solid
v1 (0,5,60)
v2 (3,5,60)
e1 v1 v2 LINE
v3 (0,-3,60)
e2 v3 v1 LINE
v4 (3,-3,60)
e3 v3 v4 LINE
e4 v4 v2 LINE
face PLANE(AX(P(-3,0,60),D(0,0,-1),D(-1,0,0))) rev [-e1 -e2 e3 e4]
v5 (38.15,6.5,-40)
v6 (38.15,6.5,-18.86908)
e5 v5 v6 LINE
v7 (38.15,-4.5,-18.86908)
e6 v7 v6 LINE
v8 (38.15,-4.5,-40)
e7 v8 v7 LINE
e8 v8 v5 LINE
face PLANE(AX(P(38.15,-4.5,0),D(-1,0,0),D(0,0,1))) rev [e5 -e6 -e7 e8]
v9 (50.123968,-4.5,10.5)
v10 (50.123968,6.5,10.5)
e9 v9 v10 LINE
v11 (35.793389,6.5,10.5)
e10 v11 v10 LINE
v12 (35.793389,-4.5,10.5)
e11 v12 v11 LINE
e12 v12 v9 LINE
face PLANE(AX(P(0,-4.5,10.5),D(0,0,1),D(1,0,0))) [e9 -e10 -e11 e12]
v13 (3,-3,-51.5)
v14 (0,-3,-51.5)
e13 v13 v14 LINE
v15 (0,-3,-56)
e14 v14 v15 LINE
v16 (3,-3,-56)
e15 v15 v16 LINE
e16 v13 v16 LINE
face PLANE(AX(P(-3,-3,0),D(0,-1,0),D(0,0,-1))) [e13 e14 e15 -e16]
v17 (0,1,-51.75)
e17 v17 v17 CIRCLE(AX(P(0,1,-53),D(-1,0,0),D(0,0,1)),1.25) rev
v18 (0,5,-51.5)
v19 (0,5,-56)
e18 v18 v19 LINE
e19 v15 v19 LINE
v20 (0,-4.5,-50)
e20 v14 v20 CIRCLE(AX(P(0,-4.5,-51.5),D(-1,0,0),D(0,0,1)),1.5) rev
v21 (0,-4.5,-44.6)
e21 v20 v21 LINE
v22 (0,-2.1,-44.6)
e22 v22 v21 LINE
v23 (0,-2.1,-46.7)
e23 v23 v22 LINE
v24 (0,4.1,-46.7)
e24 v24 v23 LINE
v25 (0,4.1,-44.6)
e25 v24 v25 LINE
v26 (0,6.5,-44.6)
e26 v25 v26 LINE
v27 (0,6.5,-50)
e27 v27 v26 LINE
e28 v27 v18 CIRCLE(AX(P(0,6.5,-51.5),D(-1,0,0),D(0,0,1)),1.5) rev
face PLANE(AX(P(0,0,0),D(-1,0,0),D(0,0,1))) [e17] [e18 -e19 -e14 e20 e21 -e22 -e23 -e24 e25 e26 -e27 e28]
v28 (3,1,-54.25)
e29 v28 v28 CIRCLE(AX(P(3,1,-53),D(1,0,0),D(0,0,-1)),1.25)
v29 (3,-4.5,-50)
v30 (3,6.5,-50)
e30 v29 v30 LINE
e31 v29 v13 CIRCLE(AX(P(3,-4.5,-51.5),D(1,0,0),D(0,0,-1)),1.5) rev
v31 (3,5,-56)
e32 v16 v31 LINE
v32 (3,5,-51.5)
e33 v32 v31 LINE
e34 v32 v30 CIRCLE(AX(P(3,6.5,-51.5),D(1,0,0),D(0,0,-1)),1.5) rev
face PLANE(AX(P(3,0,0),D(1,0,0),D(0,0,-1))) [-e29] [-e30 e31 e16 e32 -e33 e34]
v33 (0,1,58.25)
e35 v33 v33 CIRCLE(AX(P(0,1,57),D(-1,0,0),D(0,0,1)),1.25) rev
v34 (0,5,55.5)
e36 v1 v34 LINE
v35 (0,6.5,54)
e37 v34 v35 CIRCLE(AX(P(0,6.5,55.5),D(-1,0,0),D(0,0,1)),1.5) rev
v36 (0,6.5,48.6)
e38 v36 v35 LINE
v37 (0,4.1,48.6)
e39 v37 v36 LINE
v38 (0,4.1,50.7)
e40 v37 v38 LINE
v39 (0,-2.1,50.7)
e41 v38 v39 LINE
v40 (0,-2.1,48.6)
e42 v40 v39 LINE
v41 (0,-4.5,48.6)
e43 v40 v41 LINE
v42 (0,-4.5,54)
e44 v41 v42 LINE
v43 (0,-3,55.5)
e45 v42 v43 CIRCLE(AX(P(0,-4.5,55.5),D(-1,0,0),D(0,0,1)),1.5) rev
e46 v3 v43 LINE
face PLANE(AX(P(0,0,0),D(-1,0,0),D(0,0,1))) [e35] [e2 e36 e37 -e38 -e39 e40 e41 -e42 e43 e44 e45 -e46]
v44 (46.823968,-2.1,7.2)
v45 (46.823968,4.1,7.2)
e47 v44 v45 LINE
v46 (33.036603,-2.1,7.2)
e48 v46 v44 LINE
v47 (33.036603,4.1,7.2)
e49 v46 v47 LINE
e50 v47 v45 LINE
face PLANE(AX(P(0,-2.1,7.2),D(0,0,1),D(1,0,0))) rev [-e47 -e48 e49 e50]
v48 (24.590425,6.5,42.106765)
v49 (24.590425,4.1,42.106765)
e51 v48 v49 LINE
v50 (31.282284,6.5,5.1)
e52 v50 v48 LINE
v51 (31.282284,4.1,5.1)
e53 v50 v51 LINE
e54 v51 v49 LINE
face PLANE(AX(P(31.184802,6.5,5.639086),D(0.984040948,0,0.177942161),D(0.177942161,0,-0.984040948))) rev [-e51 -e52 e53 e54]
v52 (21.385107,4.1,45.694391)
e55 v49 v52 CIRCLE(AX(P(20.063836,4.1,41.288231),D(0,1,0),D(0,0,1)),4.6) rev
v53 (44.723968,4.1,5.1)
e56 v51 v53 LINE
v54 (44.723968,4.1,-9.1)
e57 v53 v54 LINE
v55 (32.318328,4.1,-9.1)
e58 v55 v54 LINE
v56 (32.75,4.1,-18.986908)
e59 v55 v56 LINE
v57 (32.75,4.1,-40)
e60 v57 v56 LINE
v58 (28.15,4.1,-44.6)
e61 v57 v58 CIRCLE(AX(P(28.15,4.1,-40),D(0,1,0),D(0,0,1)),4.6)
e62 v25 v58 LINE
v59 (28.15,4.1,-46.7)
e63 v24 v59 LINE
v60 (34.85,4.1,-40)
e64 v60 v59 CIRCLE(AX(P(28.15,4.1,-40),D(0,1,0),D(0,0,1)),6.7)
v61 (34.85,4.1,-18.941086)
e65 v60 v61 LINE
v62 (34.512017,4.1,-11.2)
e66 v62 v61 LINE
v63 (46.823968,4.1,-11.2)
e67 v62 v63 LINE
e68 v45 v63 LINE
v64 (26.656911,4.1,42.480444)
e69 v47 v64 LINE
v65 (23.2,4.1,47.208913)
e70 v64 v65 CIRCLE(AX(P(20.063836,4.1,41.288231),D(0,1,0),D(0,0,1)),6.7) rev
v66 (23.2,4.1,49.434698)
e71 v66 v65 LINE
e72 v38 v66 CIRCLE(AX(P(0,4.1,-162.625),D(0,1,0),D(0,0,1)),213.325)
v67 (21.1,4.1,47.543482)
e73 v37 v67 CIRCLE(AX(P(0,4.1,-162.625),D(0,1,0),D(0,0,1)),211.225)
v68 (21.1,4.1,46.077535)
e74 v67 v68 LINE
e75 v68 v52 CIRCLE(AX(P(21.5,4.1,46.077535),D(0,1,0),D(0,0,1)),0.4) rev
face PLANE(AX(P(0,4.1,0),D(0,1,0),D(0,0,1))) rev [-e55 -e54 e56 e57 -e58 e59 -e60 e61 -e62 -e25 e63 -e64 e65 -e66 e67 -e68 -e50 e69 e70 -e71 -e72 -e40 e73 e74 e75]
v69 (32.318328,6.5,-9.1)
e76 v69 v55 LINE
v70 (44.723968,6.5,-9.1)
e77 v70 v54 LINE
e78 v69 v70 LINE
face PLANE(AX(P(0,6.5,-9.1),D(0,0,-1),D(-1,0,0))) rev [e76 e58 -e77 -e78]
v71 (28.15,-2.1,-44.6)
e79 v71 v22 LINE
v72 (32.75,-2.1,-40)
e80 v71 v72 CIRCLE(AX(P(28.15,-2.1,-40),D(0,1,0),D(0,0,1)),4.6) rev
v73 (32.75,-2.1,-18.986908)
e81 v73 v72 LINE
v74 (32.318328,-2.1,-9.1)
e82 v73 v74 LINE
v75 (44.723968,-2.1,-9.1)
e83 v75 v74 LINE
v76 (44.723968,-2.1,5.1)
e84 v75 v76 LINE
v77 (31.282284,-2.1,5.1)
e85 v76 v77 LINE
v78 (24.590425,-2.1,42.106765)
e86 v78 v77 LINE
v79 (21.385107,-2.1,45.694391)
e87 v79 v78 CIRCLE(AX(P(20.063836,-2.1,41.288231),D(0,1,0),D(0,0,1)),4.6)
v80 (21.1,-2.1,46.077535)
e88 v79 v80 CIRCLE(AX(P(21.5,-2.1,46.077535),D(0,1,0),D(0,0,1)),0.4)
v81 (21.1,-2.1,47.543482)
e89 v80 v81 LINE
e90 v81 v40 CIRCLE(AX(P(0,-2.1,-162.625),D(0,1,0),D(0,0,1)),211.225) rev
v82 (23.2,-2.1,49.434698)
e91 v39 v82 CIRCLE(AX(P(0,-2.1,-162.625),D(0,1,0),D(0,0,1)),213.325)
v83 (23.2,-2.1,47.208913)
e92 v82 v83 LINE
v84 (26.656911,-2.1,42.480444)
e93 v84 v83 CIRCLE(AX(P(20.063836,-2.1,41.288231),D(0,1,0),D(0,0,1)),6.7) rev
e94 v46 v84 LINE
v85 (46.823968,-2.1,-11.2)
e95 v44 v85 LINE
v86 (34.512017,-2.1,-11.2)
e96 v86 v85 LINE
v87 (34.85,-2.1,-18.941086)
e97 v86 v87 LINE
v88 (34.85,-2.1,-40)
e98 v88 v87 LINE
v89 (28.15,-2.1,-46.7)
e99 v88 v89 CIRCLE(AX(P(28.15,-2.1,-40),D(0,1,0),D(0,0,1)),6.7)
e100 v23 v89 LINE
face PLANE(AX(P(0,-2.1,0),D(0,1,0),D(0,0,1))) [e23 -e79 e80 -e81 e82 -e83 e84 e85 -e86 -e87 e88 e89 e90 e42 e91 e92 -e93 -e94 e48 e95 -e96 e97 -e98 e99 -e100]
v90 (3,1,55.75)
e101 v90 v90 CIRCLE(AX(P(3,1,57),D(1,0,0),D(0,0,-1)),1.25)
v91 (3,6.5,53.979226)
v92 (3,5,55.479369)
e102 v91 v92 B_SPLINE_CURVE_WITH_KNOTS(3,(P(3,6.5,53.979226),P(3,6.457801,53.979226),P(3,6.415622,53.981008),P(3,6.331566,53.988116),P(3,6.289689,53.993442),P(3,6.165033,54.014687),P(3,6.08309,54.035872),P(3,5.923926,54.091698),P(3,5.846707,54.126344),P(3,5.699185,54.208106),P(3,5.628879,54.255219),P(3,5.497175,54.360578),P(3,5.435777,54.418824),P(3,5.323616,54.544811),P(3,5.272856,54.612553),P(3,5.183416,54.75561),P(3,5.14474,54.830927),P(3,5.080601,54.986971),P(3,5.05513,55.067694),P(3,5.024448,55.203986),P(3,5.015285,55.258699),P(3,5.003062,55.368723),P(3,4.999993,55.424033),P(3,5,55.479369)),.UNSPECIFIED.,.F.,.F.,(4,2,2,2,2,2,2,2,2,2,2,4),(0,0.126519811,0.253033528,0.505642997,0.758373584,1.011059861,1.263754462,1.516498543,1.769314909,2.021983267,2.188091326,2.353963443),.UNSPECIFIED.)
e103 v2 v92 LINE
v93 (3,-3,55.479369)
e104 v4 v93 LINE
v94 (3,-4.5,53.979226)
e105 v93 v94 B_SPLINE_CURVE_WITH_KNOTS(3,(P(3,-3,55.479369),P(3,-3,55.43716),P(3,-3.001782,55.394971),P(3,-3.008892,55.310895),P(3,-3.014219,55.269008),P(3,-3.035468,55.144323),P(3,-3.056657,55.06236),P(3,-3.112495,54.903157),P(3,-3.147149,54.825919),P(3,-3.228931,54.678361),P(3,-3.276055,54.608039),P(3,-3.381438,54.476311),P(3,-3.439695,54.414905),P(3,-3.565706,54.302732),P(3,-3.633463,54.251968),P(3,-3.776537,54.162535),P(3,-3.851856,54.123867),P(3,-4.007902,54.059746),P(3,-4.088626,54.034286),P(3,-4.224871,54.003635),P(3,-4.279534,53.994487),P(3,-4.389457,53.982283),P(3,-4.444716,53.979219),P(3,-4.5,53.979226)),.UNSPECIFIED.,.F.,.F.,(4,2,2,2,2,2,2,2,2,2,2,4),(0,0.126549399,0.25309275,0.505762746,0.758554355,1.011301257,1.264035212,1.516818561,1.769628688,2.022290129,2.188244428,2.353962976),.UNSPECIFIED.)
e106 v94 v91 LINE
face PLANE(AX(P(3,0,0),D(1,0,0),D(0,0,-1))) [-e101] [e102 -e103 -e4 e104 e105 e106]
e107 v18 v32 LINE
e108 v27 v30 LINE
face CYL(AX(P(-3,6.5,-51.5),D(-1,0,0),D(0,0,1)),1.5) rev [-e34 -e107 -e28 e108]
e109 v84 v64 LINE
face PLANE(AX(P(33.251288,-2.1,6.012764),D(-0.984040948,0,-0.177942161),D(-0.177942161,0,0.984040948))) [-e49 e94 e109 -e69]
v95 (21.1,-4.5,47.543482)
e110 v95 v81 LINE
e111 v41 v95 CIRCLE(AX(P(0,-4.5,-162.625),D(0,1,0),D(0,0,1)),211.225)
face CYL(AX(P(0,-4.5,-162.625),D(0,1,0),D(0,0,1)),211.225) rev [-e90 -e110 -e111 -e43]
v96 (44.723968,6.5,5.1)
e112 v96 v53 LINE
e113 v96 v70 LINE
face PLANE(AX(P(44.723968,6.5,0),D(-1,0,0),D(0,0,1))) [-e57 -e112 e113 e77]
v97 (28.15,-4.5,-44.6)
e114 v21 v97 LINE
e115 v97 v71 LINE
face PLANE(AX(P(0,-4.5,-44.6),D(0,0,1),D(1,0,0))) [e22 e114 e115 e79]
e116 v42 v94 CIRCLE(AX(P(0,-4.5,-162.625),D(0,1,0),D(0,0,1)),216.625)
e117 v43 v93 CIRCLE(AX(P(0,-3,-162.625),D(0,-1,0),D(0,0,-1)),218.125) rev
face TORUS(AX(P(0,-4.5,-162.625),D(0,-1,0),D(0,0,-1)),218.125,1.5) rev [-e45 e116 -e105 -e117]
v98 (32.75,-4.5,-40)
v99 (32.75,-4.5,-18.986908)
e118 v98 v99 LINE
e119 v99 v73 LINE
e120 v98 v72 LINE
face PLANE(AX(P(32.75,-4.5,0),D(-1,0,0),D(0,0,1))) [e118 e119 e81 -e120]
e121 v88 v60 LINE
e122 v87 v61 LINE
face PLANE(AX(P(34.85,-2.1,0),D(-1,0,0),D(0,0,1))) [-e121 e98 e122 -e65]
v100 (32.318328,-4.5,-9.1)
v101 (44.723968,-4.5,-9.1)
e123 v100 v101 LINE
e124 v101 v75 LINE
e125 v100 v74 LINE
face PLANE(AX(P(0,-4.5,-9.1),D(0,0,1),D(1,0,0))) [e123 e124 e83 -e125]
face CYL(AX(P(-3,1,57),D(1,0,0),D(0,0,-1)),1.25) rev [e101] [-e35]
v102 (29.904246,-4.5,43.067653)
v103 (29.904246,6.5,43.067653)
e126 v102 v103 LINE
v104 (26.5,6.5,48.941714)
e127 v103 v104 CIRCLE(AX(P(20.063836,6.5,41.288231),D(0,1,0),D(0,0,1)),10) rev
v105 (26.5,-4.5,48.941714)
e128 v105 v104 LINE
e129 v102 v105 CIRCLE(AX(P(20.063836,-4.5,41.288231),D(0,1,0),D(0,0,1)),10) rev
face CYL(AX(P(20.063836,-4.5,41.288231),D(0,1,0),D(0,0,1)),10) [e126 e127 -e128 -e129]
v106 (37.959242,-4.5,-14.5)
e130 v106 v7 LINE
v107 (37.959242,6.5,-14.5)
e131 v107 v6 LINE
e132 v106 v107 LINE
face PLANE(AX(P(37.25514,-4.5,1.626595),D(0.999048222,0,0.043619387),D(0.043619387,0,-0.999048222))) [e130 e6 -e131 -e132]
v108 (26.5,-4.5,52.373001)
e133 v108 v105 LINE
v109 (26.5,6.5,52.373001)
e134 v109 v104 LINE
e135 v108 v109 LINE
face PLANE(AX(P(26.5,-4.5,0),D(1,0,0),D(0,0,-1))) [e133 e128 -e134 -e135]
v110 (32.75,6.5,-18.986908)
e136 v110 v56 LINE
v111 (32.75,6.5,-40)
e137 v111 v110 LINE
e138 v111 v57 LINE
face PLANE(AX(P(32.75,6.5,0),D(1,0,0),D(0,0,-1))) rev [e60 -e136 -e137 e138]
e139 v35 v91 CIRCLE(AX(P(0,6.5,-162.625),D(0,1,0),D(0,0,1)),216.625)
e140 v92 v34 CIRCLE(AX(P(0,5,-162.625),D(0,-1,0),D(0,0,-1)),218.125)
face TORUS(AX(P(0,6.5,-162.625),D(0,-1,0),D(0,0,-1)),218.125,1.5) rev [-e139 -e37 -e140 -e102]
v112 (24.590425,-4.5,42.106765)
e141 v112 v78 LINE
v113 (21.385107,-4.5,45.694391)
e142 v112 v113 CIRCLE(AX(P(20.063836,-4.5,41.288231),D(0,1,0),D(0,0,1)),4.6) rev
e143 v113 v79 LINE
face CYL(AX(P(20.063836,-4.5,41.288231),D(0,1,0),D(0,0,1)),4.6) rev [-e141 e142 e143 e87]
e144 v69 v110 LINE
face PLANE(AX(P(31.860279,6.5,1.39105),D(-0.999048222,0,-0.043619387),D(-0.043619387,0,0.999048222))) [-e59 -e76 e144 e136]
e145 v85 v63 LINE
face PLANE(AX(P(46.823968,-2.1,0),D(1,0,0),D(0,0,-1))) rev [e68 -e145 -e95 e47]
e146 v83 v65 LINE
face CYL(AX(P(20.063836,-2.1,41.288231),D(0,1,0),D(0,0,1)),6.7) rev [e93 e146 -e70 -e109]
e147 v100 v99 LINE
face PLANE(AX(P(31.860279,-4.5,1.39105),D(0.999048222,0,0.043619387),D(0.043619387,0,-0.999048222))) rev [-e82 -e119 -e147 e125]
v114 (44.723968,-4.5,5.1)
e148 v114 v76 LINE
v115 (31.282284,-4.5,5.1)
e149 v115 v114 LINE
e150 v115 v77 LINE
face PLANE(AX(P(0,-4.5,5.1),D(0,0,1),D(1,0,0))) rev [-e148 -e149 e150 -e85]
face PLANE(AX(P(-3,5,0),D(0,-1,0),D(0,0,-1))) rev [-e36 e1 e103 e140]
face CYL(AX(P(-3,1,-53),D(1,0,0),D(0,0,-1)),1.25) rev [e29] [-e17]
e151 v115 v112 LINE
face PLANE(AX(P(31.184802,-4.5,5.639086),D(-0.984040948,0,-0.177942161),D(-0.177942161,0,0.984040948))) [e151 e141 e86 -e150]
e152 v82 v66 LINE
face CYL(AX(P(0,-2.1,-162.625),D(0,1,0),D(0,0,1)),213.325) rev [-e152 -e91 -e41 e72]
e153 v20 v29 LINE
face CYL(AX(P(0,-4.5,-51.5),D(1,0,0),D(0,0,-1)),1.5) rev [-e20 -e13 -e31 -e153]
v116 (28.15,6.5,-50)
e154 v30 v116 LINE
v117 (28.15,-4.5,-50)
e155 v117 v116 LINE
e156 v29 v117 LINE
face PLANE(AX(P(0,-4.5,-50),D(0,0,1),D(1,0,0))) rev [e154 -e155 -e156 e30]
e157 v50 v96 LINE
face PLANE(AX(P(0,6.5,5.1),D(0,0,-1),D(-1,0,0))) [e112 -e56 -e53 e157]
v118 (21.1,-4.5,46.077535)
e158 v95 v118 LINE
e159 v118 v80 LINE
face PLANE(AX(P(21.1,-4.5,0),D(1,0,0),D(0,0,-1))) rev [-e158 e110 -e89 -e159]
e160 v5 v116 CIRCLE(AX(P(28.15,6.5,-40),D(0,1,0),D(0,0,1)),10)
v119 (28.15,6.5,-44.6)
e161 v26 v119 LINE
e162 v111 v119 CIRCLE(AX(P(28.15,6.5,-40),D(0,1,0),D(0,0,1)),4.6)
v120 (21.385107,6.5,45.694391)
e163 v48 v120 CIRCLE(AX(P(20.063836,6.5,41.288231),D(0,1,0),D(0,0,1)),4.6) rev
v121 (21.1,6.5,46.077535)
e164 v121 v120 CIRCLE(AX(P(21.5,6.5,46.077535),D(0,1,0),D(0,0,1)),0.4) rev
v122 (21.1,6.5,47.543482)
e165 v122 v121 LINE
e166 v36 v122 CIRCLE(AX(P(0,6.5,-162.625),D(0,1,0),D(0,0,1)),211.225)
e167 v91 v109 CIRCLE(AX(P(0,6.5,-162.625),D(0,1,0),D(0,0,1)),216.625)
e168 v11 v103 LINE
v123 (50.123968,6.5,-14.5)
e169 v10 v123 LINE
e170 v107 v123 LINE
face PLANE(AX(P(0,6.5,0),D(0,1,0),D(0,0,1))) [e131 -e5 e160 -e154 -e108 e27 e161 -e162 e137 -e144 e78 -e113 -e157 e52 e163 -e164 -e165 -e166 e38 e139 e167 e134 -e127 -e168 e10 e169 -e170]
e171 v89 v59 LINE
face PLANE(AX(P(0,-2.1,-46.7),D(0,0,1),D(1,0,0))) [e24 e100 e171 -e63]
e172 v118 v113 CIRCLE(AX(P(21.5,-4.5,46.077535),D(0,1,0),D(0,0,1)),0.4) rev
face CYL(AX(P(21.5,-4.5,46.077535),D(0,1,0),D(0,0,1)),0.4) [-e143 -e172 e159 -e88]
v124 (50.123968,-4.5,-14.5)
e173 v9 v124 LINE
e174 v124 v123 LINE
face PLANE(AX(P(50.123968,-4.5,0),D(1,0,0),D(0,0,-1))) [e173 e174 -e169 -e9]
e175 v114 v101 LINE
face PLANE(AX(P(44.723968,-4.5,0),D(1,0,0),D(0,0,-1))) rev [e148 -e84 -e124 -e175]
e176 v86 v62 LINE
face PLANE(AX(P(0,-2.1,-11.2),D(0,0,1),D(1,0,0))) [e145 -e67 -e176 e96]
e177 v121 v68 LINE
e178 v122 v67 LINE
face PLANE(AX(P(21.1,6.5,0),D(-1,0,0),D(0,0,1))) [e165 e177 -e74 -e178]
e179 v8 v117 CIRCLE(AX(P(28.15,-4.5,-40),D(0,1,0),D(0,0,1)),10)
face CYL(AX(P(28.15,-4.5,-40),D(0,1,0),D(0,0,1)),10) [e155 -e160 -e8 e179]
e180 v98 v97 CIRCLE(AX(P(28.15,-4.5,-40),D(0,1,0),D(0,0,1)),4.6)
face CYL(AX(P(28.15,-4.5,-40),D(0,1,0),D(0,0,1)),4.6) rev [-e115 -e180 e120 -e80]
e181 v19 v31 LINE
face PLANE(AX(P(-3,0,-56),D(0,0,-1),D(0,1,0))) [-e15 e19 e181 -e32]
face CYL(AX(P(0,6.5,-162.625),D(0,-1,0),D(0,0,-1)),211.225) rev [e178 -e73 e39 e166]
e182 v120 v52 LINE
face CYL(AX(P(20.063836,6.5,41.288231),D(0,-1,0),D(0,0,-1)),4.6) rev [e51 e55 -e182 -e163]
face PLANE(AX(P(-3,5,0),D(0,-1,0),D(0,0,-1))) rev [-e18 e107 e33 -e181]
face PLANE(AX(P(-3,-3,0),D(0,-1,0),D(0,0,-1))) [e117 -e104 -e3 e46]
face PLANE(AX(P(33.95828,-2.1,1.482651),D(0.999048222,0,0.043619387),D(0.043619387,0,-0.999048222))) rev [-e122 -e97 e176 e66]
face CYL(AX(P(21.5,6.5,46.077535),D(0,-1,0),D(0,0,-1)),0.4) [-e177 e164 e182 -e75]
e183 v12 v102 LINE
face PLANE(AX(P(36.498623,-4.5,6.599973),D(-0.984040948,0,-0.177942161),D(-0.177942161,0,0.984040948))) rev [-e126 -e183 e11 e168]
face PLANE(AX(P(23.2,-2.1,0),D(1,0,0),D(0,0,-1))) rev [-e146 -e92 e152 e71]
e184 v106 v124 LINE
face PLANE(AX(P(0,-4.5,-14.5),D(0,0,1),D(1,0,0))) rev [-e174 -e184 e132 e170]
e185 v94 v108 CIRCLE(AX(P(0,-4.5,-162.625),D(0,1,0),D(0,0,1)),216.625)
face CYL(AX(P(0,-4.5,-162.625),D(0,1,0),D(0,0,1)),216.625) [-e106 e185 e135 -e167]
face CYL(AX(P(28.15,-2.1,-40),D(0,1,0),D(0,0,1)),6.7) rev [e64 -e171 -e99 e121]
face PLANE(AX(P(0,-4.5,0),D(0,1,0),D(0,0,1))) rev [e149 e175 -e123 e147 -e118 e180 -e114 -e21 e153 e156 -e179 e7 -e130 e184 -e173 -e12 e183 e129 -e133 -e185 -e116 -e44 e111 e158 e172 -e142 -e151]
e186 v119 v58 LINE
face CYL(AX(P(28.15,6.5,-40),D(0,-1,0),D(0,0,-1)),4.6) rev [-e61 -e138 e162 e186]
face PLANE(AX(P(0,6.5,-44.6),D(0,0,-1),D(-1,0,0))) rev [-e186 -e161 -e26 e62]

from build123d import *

# Parameters (mm, degrees)
BOSS_EXTRUDE1_DEPTH      = 4.5
CUT_EXTRUDE3_DEPTH       = 2.1
BOSS_EXTRUDE3_START      = 6.5
BOSS_EXTRUDE3_DEPTH      = 6.5
CUT_EXTRUDE4_START       = 4.1
CUT_EXTRUDE4_DEPTH       = 4.1
BOSS_EXTRUDE4_DEPTH      = 3
BOSS_EXTRUDE4_DEPTH_BACK = 3
SKETCH4_R                = 1.25
SKETCH4_W                = 6
SKETCH4_H                = 8
FILLET1_R                = 1.5
SKETCH5_W                = 150
SKETCH5_H                = 40
CUT_EXTRUDE5_DEPTH       = 79.451654949


with BuildPart() as part:
    # Sketch2 → Boss-Extrude1 (new body)
    with BuildSketch(Plane(origin=(0, 0, 0), x_dir=(1, 0, 0), z_dir=(0, 1, 0))):
        with BuildLine():
            Line((-28.15, 50), (28.15, 50))
            ThreePointArc((28.15, 50), (35.221067812, 47.071067812), (38.15, 40))
            Line((38.15, 40), (38.15, 18.869079534))
            Line((38.15, 18.869079534), (37.959241868, 14.5))
            Line((37.959241868, 14.5), (50.123967842, 14.5))
            Line((50.123967842, 14.5), (50.123967842, -10.5))
            Line((50.123967842, -10.5), (35.7933894, -10.5))
            Line((35.7933894, -10.5), (29.904245688, -43.067652969))
            ThreePointArc((29.904245688, -43.067652969), (28.715879749, -46.302425464), (26.5, -48.941713937))
            Line((26.5, -48.941713937), (26.5, -52.373001444))
            ThreePointArc((26.5, -52.373001444), (0, -54), (-26.5, -52.373001444))
            Line((-26.5, -52.373001444), (-26.5, -48.941713937))
            ThreePointArc((-26.5, -48.941713937), (-28.715879749, -46.302425464), (-29.904245688, -43.067652969))
            Line((-29.904245688, -43.067652969), (-35.7933894, -10.5))
            Line((-35.7933894, -10.5), (-50.123967842, -10.5))
            Line((-50.123967842, -10.5), (-50.123967842, 14.5))
            Line((-50.123967842, 14.5), (-37.959241868, 14.5))
            Line((-37.959241868, 14.5), (-38.15, 18.869079534))
            Line((-38.15, 18.869079534), (-38.15, 40))
            ThreePointArc((-38.15, 40), (-35.221067812, 47.071067812), (-28.15, 50))
        make_face()
        with BuildLine():
            Line((-32.75, 40), (-32.75, 18.986907953))
            Line((-32.75, 18.986907953), (-32.318328276, 9.1))
            Line((-32.318328276, 9.1), (-44.723967842, 9.1))
            Line((-44.723967842, 9.1), (-44.723967842, -5.1))
            Line((-44.723967842, -5.1), (-31.282284108, -5.1))
            Line((-31.282284108, -5.1), (-24.590424569, -42.106765297))
            ThreePointArc((-24.590424569, -42.106765297), (-23.494161062, -44.35301053), (-21.385106897, -45.694391107))
            ThreePointArc((-21.385106897, -45.694391107), (-21.179097179, -45.838743936), (-21.1, -46.077535434))
            Line((-21.1, -46.077535434), (-21.1, -47.543481521))
            ThreePointArc((-21.1, -47.543481521), (0, -48.6), (21.1, -47.543481521))
            Line((21.1, -47.543481521), (21.1, -46.077535434))
            ThreePointArc((21.1, -46.077535434), (21.179097179, -45.838743936), (21.385106897, -45.694391107))
            ThreePointArc((21.385106897, -45.694391107), (23.494161062, -44.35301053), (24.590424569, -42.106765297))
            Line((24.590424569, -42.106765297), (31.282284108, -5.1))
            Line((31.282284108, -5.1), (44.723967842, -5.1))
            Line((44.723967842, -5.1), (44.723967842, 9.1))
            Line((44.723967842, 9.1), (32.318328276, 9.1))
            Line((32.318328276, 9.1), (32.75, 18.986907953))
            Line((32.75, 18.986907953), (32.75, 40))
            ThreePointArc((32.75, 40), (31.402691193, 43.252691193), (28.15, 44.6))
            Line((28.15, 44.6), (-28.15, 44.6))
            ThreePointArc((-28.15, 44.6), (-31.402691193, 43.252691193), (-32.75, 40))
        make_face(mode=Mode.SUBTRACT)
    extrude(amount=-BOSS_EXTRUDE1_DEPTH)

    # Sketch2<6> → Cut-Extrude3 (cut)
    with BuildSketch(Plane(origin=(0, 0, 0), x_dir=(1, 0, 0), z_dir=(0, 1, 0))):
        with BuildLine():
            Line((-28.15, 46.7), (28.15, 46.7))
            ThreePointArc((28.15, 46.7), (32.887615434, 44.737615434), (34.85, 40))
            Line((34.85, 40), (34.85, 18.94108579))
            Line((34.85, 18.94108579), (34.512016895, 11.2))
            Line((34.512016895, 11.2), (46.823967842, 11.2))
            Line((46.823967842, 11.2), (46.823967842, -7.2))
            Line((46.823967842, -7.2), (33.036602833, -7.2))
            Line((33.036602833, -7.2), (26.656910559, -42.480443836))
            ThreePointArc((26.656910559, -42.480443836), (25.472544462, -45.242453785), (23.2, -47.208913466))
            Line((23.2, -47.208913466), (23.2, -49.434698257))
            ThreePointArc((23.2, -49.434698257), (0, -50.7), (-23.2, -49.434698257))
            Line((-23.2, -49.434698257), (-23.2, -47.208913466))
            ThreePointArc((-23.2, -47.208913466), (-25.472544462, -45.242453785), (-26.656910559, -42.480443836))
            Line((-26.656910559, -42.480443836), (-33.036602833, -7.2))
            Line((-33.036602833, -7.2), (-46.823967842, -7.2))
            Line((-46.823967842, -7.2), (-46.823967842, 11.2))
            Line((-46.823967842, 11.2), (-34.512016895, 11.2))
            Line((-34.512016895, 11.2), (-34.85, 18.94108579))
            Line((-34.85, 18.94108579), (-34.85, 40))
            ThreePointArc((-34.85, 40), (-32.887615434, 44.737615434), (-28.15, 46.7))
        make_face()
    extrude(amount=-CUT_EXTRUDE3_DEPTH, mode=Mode.SUBTRACT)

    # Sketch2<7> → Boss-Extrude3 (add)
    with BuildSketch(Plane(origin=(0, 0, 0), x_dir=(1, 0, 0), z_dir=(0, 1, 0)).offset(BOSS_EXTRUDE3_START)):
        with BuildLine():
            Line((28.15, 50), (-28.15, 50))
            ThreePointArc((-28.15, 50), (-35.221067812, 47.071067812), (-38.15, 40))
            Line((-38.15, 40), (-38.15, 18.869079534))
            Line((-38.15, 18.869079534), (-37.959241868, 14.5))
            Line((-37.959241868, 14.5), (-50.123967842, 14.5))
            Line((-50.123967842, 14.5), (-50.123967842, -10.5))
            Line((-50.123967842, -10.5), (-35.7933894, -10.5))
            Line((-35.7933894, -10.5), (-29.904245688, -43.067652969))
            ThreePointArc((-29.904245688, -43.067652969), (-28.715879749, -46.302425464), (-26.5, -48.941713937))
            Line((-26.5, -48.941713937), (-26.5, -52.373001444))
            ThreePointArc((-26.5, -52.373001444), (0, -54), (26.5, -52.373001444))
            Line((26.5, -52.373001444), (26.5, -48.941713937))
            ThreePointArc((26.5, -48.941713937), (28.715879749, -46.302425464), (29.904245688, -43.067652969))
            Line((29.904245688, -43.067652969), (35.7933894, -10.5))
            Line((35.7933894, -10.5), (50.123967842, -10.5))
            Line((50.123967842, -10.5), (50.123967842, 14.5))
            Line((50.123967842, 14.5), (37.959241868, 14.5))
            Line((37.959241868, 14.5), (38.15, 18.869079534))
            Line((38.15, 18.869079534), (38.15, 40))
            ThreePointArc((38.15, 40), (35.221067812, 47.071067812), (28.15, 50))
        make_face()
        with BuildLine():
            Line((-44.723967842, 9.1), (-32.318328276, 9.1))
            Line((-32.318328276, 9.1), (-32.75, 18.986907953))
            Line((-32.75, 18.986907953), (-32.75, 40))
            ThreePointArc((-32.75, 40), (-31.402691193, 43.252691193), (-28.15, 44.6))
            Line((-28.15, 44.6), (28.15, 44.6))
            ThreePointArc((28.15, 44.6), (31.402691193, 43.252691193), (32.75, 40))
            Line((32.75, 40), (32.75, 18.986907953))
            Line((32.75, 18.986907953), (32.318328276, 9.1))
            Line((32.318328276, 9.1), (44.723967842, 9.1))
            Line((44.723967842, 9.1), (44.723967842, -5.1))
            Line((44.723967842, -5.1), (31.282284108, -5.1))
            Line((31.282284108, -5.1), (24.590424569, -42.106765297))
            ThreePointArc((24.590424569, -42.106765297), (23.494161062, -44.35301053), (21.385106897, -45.694391107))
            ThreePointArc((21.385106897, -45.694391107), (21.179097179, -45.838743936), (21.1, -46.077535434))
            Line((21.1, -46.077535434), (21.1, -47.543481521))
            ThreePointArc((21.1, -47.543481521), (0, -48.6), (-21.1, -47.543481521))
            Line((-21.1, -47.543481521), (-21.1, -46.077535434))
            ThreePointArc((-21.1, -46.077535434), (-21.179097179, -45.838743936), (-21.385106897, -45.694391107))
            ThreePointArc((-21.385106897, -45.694391107), (-23.494161062, -44.35301053), (-24.590424569, -42.106765297))
            Line((-24.590424569, -42.106765297), (-31.282284108, -5.1))
            Line((-31.282284108, -5.1), (-44.723967842, -5.1))
            Line((-44.723967842, -5.1), (-44.723967842, 9.1))
        make_face(mode=Mode.SUBTRACT)
    extrude(amount=-BOSS_EXTRUDE3_DEPTH)

    # Sketch2<8> → Cut-Extrude4 (cut)
    with BuildSketch(Plane(origin=(0, 0, 0), x_dir=(1, 0, 0), z_dir=(0, 1, 0)).offset(CUT_EXTRUDE4_START)):
        with BuildLine():
            Line((28.15, 46.7), (-28.15, 46.7))
            ThreePointArc((-28.15, 46.7), (-32.887615434, 44.737615434), (-34.85, 40))
            Line((-34.85, 40), (-34.85, 18.94108579))
            Line((-34.85, 18.94108579), (-34.512016895, 11.2))
            Line((-34.512016895, 11.2), (-46.823967842, 11.2))
            Line((-46.823967842, 11.2), (-46.823967842, -7.2))
            Line((-46.823967842, -7.2), (-33.036602833, -7.2))
            Line((-33.036602833, -7.2), (-26.656910559, -42.480443836))
            ThreePointArc((-26.656910559, -42.480443836), (-25.472544462, -45.242453785), (-23.2, -47.208913466))
            Line((-23.2, -47.208913466), (-23.2, -49.434698257))
            ThreePointArc((-23.2, -49.434698257), (0, -50.7), (23.2, -49.434698257))
            Line((23.2, -49.434698257), (23.2, -47.208913466))
            ThreePointArc((23.2, -47.208913466), (25.472544462, -45.242453785), (26.656910559, -42.480443836))
            Line((26.656910559, -42.480443836), (33.036602833, -7.2))
            Line((33.036602833, -7.2), (46.823967842, -7.2))
            Line((46.823967842, -7.2), (46.823967842, 11.2))
            Line((46.823967842, 11.2), (34.512016895, 11.2))
            Line((34.512016895, 11.2), (34.85, 18.94108579))
            Line((34.85, 18.94108579), (34.85, 40))
            ThreePointArc((34.85, 40), (32.887615434, 44.737615434), (28.15, 46.7))
        make_face()
        with BuildLine():
            Line((-32.75, 18.986907953), (-32.75, 40))
            ThreePointArc((-32.75, 40), (-31.402691193, 43.252691193), (-28.15, 44.6))
            Line((-28.15, 44.6), (28.15, 44.6))
            ThreePointArc((28.15, 44.6), (31.402691193, 43.252691193), (32.75, 40))
            Line((32.75, 40), (32.75, 18.986907953))
            Line((32.75, 18.986907953), (32.318328276, 9.1))
            Line((32.318328276, 9.1), (44.723967842, 9.1))
            Line((44.723967842, 9.1), (44.723967842, -5.1))
            Line((44.723967842, -5.1), (31.282284108, -5.1))
            Line((31.282284108, -5.1), (24.590424569, -42.106765297))
            ThreePointArc((24.590424569, -42.106765297), (23.494161062, -44.35301053), (21.385106897, -45.694391107))
            ThreePointArc((21.385106897, -45.694391107), (21.179097179, -45.838743936), (21.1, -46.077535434))
            Line((21.1, -46.077535434), (21.1, -47.543481521))
            ThreePointArc((21.1, -47.543481521), (0, -48.6), (-21.1, -47.543481521))
            Line((-21.1, -47.543481521), (-21.1, -46.077535434))
            ThreePointArc((-21.1, -46.077535434), (-21.179097179, -45.838743936), (-21.385106897, -45.694391107))
            ThreePointArc((-21.385106897, -45.694391107), (-23.494161062, -44.35301053), (-24.590424569, -42.106765297))
            Line((-24.590424569, -42.106765297), (-31.282284108, -5.1))
            Line((-31.282284108, -5.1), (-44.723967842, -5.1))
            Line((-44.723967842, -5.1), (-44.723967842, 9.1))
            Line((-44.723967842, 9.1), (-32.318328276, 9.1))
            Line((-32.318328276, 9.1), (-32.75, 18.986907953))
        make_face(mode=Mode.SUBTRACT)
    extrude(amount=-CUT_EXTRUDE4_DEPTH, mode=Mode.SUBTRACT)

    # Sketch4 → Boss-Extrude4 (add, two sides: drawn at the far end of the back side and taken through both)
    # profile 1 of 2: a face of its own
    with BuildSketch(Plane(origin=(0, 0, 0), x_dir=(0, 0, -1), z_dir=(1, 0, 0)).offset(-BOSS_EXTRUDE4_DEPTH_BACK)):
        Polygon((-52, 5), (-52, -3), (-54, -3), (-60, -3), (-60, 5), (-54, 5), align=None)
        with Locations((-57, 1)):
            Circle(SKETCH4_R, mode=Mode.SUBTRACT)
    # profile 2 of 2: a face of its own
    with BuildSketch(Plane(origin=(0, 0, 0), x_dir=(0, 0, -1), z_dir=(1, 0, 0)).offset(-BOSS_EXTRUDE4_DEPTH_BACK)):
        with Locations((53, 1)):
            Rectangle(SKETCH4_W, SKETCH4_H)
        with Locations((53, 1)):
            Circle(SKETCH4_R, mode=Mode.SUBTRACT)
    extrude(amount=BOSS_EXTRUDE4_DEPTH + BOSS_EXTRUDE4_DEPTH_BACK)

    # Fillet1
    fillet1_edges = [part.edges().sort_by_distance(p)[0] for p in [
        (0, 5, 54),
        (0, -3, 54),
        (0, -3, -50),
        (0, 5, -50),
    ]]
    fillet(fillet1_edges, radius=FILLET1_R - 0.0001)  # a hair under: the kernel refuses the full size

    # Sketch5 → Cut-Extrude5 (cut, through all)
    with BuildSketch(Plane(origin=(0, 0, 0), x_dir=(0, 0, -1), z_dir=(1, 0, 0))):
        Rectangle(SKETCH5_W, SKETCH5_H)
    extrude(amount=-CUT_EXTRUDE5_DEPTH, mode=Mode.SUBTRACT)


solid = part.part
